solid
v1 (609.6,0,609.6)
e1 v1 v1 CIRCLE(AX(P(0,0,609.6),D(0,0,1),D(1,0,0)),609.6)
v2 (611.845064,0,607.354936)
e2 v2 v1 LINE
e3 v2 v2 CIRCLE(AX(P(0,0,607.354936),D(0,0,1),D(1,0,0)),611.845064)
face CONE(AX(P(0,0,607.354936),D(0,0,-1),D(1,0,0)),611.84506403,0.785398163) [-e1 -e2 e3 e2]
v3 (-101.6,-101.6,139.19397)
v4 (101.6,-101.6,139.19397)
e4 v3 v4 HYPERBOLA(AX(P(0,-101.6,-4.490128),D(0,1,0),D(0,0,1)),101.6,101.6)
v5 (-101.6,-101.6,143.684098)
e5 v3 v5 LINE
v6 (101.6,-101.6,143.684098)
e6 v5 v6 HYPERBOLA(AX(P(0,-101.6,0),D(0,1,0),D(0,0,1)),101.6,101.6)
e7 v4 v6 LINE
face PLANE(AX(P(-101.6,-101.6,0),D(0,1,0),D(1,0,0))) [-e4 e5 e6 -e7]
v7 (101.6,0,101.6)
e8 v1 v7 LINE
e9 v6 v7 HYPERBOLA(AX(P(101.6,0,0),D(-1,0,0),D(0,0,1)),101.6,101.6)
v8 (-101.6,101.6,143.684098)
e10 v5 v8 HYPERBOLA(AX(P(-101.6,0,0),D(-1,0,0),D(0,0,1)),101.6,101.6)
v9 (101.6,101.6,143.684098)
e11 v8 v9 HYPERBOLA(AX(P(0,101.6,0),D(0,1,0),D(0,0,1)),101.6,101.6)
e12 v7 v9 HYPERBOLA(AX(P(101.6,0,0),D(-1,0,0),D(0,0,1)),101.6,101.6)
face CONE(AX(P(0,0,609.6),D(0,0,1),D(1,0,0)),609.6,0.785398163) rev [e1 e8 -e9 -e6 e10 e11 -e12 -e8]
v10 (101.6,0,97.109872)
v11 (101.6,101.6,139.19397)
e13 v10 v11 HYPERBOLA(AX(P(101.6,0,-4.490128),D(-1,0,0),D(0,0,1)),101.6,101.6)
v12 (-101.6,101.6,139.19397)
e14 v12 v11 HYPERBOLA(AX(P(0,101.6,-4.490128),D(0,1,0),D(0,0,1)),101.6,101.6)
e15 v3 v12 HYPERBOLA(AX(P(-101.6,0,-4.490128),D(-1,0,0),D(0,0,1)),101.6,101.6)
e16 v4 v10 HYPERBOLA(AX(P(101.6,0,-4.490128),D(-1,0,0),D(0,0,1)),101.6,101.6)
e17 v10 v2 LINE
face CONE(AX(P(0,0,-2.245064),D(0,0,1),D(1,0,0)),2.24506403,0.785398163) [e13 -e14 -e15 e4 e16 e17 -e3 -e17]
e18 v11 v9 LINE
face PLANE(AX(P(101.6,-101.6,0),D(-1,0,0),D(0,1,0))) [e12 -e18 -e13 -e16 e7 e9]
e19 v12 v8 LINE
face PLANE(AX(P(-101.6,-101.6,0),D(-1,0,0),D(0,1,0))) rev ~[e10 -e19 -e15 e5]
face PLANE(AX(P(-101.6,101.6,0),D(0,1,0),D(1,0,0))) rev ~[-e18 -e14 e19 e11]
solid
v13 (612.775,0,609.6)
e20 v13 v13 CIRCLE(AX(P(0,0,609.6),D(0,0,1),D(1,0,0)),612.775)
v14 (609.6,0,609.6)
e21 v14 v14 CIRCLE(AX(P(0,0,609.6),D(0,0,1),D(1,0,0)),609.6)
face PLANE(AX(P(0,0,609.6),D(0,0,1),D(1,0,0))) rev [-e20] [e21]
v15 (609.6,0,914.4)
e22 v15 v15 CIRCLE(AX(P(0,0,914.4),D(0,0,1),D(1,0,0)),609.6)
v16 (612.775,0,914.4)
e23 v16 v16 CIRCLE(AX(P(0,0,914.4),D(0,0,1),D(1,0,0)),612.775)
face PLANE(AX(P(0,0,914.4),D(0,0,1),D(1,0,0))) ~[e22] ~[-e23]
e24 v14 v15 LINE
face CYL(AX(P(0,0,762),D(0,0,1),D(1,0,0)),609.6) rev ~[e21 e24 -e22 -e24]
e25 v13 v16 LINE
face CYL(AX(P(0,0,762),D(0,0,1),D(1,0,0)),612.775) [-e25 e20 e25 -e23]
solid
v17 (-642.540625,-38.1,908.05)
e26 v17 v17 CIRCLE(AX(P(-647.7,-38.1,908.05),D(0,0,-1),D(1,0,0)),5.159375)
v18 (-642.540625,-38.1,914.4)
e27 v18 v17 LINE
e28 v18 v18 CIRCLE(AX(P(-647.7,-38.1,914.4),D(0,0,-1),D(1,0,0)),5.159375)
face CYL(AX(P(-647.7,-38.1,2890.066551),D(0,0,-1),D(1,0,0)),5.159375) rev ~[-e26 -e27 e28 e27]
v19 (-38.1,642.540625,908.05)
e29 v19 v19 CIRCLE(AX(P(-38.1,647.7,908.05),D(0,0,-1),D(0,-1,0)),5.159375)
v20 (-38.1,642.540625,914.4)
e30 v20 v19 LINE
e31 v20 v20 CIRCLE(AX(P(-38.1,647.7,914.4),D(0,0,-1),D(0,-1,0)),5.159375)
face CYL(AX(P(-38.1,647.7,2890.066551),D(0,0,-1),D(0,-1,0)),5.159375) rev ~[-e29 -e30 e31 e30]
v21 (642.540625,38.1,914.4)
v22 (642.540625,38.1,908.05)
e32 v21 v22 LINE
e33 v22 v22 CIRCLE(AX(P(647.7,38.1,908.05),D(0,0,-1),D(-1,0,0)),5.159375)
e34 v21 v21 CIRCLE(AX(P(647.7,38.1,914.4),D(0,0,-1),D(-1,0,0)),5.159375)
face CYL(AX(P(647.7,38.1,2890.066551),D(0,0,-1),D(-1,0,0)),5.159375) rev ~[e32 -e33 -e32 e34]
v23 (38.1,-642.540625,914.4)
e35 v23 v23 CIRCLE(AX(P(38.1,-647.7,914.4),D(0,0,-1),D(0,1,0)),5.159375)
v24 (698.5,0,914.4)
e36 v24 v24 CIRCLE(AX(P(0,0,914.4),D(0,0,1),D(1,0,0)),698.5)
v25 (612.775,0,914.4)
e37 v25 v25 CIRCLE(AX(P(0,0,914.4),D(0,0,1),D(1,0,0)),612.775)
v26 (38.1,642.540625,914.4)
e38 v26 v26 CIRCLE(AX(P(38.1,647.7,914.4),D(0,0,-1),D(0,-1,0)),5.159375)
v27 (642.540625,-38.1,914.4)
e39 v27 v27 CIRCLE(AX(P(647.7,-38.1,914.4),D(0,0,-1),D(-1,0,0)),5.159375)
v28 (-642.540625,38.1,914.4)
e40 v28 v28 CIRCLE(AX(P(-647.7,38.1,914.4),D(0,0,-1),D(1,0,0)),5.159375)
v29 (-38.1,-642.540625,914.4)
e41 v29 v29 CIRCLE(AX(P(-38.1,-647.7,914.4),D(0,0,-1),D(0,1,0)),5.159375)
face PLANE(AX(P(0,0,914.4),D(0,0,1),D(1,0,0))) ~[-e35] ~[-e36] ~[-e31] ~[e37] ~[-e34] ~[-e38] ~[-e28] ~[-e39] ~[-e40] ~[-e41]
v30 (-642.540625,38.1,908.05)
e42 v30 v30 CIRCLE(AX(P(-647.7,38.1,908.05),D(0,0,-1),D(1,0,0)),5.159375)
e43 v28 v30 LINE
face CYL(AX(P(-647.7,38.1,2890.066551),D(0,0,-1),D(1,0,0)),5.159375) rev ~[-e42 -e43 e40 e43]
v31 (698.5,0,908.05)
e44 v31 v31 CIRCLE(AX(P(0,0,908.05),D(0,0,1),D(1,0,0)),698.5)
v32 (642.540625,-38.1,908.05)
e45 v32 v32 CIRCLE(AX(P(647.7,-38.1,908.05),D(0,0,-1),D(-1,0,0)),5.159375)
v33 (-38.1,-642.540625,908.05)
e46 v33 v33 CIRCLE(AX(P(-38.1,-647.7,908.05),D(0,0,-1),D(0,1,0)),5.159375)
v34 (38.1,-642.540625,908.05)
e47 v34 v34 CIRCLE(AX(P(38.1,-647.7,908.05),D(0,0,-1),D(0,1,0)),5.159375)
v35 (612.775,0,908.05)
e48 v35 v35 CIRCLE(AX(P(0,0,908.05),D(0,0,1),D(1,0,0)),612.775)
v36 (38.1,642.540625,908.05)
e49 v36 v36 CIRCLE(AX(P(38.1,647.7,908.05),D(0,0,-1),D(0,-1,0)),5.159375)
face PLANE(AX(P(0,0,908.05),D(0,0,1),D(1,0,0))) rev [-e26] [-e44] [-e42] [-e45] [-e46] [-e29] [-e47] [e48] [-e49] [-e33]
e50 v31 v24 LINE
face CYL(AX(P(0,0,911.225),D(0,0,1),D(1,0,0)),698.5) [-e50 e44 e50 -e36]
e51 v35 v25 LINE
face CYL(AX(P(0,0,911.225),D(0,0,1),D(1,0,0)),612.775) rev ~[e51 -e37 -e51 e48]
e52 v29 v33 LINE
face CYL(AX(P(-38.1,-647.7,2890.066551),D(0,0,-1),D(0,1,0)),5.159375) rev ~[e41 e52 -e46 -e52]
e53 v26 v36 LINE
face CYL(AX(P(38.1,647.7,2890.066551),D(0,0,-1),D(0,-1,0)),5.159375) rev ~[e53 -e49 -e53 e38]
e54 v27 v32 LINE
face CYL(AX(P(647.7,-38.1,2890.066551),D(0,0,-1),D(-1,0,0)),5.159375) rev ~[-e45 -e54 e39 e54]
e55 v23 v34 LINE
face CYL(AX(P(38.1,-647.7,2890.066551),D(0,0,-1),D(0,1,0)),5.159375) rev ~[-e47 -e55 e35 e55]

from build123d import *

# Parameters (mm, degrees)
F2_W            = 203.2
F2_H            = 203.2
F3_DEPTH        = 2.2460640303
F3_DEPTH_BACK   = 609.601
F4_W            = 3.175
F4_H            = 304.8
F6_W            = 85.725
F6_H            = 6.35
F9_D            = 10.31875
F9_COPIES_COUNT = 4


# Not quite as in the source:
# - a length typed as a fraction of an inch, garbled in the dataset ("3 / 203.2 mm" for 3/8 in), is restored
# - a pattern or mirror of a feature is missing from the dataset's text; its kind, count and spacing are read off the source's solid


with BuildPart() as f1:
    # F0 (on Front) → F1 (revolve)
    with BuildSketch(Plane.XZ):
        Polygon((609.6, 609.6), (2.2450640303, 2.2450640303), (2.2450640303, -2.2450640303), (611.8450640303, 607.3549359697), align=None)
    revolve(axis=Axis((0, 0, 23.5767196864), (0, 0, 1)))

    # F2 (on Top) → F3 (cut, two sides)
    with BuildSketch(Plane.XY) as f3_sk:
        Rectangle(F2_W, F2_H)
    extrude(amount=-F3_DEPTH, mode=Mode.SUBTRACT)
    extrude(f3_sk.sketch, amount=F3_DEPTH_BACK, mode=Mode.SUBTRACT)


with BuildPart() as f5:
    # F4 (on Front) → F5 (revolve)
    with BuildSketch(Plane.XZ):
        with Locations((611.1875, 762)):
            Rectangle(F4_W, F4_H)
    revolve(axis=Axis((0, 0, 23.5767196864), (0, 0, 1)))


with BuildPart() as f7:
    # F6 (on Front) → F7 (revolve)
    with BuildSketch(Plane.XZ):
        with Locations((655.6375, 911.225)):
            Rectangle(F6_W, F6_H)
    revolve(axis=Axis((0, 0, 23.5767196864), (0, 0, 1)))

    # F9 (through all)
    with Locations(Plane.XY.offset(914.4)):
        with Locations((647.7, 38.1), (647.7, -38.1)):
            f9 = Hole(F9_D / 2)

    # F9_copies: F9 ×4 about axis
    f9_copies_axis = Axis((0, 0, 0), (0, 0, 1))
    for i in range(1, F9_COPIES_COUNT):
        add(f9.rotate(f9_copies_axis, i * 360 / F9_COPIES_COUNT), mode=Mode.SUBTRACT)


solid = Compound([f1.part, f5.part, f7.part])
